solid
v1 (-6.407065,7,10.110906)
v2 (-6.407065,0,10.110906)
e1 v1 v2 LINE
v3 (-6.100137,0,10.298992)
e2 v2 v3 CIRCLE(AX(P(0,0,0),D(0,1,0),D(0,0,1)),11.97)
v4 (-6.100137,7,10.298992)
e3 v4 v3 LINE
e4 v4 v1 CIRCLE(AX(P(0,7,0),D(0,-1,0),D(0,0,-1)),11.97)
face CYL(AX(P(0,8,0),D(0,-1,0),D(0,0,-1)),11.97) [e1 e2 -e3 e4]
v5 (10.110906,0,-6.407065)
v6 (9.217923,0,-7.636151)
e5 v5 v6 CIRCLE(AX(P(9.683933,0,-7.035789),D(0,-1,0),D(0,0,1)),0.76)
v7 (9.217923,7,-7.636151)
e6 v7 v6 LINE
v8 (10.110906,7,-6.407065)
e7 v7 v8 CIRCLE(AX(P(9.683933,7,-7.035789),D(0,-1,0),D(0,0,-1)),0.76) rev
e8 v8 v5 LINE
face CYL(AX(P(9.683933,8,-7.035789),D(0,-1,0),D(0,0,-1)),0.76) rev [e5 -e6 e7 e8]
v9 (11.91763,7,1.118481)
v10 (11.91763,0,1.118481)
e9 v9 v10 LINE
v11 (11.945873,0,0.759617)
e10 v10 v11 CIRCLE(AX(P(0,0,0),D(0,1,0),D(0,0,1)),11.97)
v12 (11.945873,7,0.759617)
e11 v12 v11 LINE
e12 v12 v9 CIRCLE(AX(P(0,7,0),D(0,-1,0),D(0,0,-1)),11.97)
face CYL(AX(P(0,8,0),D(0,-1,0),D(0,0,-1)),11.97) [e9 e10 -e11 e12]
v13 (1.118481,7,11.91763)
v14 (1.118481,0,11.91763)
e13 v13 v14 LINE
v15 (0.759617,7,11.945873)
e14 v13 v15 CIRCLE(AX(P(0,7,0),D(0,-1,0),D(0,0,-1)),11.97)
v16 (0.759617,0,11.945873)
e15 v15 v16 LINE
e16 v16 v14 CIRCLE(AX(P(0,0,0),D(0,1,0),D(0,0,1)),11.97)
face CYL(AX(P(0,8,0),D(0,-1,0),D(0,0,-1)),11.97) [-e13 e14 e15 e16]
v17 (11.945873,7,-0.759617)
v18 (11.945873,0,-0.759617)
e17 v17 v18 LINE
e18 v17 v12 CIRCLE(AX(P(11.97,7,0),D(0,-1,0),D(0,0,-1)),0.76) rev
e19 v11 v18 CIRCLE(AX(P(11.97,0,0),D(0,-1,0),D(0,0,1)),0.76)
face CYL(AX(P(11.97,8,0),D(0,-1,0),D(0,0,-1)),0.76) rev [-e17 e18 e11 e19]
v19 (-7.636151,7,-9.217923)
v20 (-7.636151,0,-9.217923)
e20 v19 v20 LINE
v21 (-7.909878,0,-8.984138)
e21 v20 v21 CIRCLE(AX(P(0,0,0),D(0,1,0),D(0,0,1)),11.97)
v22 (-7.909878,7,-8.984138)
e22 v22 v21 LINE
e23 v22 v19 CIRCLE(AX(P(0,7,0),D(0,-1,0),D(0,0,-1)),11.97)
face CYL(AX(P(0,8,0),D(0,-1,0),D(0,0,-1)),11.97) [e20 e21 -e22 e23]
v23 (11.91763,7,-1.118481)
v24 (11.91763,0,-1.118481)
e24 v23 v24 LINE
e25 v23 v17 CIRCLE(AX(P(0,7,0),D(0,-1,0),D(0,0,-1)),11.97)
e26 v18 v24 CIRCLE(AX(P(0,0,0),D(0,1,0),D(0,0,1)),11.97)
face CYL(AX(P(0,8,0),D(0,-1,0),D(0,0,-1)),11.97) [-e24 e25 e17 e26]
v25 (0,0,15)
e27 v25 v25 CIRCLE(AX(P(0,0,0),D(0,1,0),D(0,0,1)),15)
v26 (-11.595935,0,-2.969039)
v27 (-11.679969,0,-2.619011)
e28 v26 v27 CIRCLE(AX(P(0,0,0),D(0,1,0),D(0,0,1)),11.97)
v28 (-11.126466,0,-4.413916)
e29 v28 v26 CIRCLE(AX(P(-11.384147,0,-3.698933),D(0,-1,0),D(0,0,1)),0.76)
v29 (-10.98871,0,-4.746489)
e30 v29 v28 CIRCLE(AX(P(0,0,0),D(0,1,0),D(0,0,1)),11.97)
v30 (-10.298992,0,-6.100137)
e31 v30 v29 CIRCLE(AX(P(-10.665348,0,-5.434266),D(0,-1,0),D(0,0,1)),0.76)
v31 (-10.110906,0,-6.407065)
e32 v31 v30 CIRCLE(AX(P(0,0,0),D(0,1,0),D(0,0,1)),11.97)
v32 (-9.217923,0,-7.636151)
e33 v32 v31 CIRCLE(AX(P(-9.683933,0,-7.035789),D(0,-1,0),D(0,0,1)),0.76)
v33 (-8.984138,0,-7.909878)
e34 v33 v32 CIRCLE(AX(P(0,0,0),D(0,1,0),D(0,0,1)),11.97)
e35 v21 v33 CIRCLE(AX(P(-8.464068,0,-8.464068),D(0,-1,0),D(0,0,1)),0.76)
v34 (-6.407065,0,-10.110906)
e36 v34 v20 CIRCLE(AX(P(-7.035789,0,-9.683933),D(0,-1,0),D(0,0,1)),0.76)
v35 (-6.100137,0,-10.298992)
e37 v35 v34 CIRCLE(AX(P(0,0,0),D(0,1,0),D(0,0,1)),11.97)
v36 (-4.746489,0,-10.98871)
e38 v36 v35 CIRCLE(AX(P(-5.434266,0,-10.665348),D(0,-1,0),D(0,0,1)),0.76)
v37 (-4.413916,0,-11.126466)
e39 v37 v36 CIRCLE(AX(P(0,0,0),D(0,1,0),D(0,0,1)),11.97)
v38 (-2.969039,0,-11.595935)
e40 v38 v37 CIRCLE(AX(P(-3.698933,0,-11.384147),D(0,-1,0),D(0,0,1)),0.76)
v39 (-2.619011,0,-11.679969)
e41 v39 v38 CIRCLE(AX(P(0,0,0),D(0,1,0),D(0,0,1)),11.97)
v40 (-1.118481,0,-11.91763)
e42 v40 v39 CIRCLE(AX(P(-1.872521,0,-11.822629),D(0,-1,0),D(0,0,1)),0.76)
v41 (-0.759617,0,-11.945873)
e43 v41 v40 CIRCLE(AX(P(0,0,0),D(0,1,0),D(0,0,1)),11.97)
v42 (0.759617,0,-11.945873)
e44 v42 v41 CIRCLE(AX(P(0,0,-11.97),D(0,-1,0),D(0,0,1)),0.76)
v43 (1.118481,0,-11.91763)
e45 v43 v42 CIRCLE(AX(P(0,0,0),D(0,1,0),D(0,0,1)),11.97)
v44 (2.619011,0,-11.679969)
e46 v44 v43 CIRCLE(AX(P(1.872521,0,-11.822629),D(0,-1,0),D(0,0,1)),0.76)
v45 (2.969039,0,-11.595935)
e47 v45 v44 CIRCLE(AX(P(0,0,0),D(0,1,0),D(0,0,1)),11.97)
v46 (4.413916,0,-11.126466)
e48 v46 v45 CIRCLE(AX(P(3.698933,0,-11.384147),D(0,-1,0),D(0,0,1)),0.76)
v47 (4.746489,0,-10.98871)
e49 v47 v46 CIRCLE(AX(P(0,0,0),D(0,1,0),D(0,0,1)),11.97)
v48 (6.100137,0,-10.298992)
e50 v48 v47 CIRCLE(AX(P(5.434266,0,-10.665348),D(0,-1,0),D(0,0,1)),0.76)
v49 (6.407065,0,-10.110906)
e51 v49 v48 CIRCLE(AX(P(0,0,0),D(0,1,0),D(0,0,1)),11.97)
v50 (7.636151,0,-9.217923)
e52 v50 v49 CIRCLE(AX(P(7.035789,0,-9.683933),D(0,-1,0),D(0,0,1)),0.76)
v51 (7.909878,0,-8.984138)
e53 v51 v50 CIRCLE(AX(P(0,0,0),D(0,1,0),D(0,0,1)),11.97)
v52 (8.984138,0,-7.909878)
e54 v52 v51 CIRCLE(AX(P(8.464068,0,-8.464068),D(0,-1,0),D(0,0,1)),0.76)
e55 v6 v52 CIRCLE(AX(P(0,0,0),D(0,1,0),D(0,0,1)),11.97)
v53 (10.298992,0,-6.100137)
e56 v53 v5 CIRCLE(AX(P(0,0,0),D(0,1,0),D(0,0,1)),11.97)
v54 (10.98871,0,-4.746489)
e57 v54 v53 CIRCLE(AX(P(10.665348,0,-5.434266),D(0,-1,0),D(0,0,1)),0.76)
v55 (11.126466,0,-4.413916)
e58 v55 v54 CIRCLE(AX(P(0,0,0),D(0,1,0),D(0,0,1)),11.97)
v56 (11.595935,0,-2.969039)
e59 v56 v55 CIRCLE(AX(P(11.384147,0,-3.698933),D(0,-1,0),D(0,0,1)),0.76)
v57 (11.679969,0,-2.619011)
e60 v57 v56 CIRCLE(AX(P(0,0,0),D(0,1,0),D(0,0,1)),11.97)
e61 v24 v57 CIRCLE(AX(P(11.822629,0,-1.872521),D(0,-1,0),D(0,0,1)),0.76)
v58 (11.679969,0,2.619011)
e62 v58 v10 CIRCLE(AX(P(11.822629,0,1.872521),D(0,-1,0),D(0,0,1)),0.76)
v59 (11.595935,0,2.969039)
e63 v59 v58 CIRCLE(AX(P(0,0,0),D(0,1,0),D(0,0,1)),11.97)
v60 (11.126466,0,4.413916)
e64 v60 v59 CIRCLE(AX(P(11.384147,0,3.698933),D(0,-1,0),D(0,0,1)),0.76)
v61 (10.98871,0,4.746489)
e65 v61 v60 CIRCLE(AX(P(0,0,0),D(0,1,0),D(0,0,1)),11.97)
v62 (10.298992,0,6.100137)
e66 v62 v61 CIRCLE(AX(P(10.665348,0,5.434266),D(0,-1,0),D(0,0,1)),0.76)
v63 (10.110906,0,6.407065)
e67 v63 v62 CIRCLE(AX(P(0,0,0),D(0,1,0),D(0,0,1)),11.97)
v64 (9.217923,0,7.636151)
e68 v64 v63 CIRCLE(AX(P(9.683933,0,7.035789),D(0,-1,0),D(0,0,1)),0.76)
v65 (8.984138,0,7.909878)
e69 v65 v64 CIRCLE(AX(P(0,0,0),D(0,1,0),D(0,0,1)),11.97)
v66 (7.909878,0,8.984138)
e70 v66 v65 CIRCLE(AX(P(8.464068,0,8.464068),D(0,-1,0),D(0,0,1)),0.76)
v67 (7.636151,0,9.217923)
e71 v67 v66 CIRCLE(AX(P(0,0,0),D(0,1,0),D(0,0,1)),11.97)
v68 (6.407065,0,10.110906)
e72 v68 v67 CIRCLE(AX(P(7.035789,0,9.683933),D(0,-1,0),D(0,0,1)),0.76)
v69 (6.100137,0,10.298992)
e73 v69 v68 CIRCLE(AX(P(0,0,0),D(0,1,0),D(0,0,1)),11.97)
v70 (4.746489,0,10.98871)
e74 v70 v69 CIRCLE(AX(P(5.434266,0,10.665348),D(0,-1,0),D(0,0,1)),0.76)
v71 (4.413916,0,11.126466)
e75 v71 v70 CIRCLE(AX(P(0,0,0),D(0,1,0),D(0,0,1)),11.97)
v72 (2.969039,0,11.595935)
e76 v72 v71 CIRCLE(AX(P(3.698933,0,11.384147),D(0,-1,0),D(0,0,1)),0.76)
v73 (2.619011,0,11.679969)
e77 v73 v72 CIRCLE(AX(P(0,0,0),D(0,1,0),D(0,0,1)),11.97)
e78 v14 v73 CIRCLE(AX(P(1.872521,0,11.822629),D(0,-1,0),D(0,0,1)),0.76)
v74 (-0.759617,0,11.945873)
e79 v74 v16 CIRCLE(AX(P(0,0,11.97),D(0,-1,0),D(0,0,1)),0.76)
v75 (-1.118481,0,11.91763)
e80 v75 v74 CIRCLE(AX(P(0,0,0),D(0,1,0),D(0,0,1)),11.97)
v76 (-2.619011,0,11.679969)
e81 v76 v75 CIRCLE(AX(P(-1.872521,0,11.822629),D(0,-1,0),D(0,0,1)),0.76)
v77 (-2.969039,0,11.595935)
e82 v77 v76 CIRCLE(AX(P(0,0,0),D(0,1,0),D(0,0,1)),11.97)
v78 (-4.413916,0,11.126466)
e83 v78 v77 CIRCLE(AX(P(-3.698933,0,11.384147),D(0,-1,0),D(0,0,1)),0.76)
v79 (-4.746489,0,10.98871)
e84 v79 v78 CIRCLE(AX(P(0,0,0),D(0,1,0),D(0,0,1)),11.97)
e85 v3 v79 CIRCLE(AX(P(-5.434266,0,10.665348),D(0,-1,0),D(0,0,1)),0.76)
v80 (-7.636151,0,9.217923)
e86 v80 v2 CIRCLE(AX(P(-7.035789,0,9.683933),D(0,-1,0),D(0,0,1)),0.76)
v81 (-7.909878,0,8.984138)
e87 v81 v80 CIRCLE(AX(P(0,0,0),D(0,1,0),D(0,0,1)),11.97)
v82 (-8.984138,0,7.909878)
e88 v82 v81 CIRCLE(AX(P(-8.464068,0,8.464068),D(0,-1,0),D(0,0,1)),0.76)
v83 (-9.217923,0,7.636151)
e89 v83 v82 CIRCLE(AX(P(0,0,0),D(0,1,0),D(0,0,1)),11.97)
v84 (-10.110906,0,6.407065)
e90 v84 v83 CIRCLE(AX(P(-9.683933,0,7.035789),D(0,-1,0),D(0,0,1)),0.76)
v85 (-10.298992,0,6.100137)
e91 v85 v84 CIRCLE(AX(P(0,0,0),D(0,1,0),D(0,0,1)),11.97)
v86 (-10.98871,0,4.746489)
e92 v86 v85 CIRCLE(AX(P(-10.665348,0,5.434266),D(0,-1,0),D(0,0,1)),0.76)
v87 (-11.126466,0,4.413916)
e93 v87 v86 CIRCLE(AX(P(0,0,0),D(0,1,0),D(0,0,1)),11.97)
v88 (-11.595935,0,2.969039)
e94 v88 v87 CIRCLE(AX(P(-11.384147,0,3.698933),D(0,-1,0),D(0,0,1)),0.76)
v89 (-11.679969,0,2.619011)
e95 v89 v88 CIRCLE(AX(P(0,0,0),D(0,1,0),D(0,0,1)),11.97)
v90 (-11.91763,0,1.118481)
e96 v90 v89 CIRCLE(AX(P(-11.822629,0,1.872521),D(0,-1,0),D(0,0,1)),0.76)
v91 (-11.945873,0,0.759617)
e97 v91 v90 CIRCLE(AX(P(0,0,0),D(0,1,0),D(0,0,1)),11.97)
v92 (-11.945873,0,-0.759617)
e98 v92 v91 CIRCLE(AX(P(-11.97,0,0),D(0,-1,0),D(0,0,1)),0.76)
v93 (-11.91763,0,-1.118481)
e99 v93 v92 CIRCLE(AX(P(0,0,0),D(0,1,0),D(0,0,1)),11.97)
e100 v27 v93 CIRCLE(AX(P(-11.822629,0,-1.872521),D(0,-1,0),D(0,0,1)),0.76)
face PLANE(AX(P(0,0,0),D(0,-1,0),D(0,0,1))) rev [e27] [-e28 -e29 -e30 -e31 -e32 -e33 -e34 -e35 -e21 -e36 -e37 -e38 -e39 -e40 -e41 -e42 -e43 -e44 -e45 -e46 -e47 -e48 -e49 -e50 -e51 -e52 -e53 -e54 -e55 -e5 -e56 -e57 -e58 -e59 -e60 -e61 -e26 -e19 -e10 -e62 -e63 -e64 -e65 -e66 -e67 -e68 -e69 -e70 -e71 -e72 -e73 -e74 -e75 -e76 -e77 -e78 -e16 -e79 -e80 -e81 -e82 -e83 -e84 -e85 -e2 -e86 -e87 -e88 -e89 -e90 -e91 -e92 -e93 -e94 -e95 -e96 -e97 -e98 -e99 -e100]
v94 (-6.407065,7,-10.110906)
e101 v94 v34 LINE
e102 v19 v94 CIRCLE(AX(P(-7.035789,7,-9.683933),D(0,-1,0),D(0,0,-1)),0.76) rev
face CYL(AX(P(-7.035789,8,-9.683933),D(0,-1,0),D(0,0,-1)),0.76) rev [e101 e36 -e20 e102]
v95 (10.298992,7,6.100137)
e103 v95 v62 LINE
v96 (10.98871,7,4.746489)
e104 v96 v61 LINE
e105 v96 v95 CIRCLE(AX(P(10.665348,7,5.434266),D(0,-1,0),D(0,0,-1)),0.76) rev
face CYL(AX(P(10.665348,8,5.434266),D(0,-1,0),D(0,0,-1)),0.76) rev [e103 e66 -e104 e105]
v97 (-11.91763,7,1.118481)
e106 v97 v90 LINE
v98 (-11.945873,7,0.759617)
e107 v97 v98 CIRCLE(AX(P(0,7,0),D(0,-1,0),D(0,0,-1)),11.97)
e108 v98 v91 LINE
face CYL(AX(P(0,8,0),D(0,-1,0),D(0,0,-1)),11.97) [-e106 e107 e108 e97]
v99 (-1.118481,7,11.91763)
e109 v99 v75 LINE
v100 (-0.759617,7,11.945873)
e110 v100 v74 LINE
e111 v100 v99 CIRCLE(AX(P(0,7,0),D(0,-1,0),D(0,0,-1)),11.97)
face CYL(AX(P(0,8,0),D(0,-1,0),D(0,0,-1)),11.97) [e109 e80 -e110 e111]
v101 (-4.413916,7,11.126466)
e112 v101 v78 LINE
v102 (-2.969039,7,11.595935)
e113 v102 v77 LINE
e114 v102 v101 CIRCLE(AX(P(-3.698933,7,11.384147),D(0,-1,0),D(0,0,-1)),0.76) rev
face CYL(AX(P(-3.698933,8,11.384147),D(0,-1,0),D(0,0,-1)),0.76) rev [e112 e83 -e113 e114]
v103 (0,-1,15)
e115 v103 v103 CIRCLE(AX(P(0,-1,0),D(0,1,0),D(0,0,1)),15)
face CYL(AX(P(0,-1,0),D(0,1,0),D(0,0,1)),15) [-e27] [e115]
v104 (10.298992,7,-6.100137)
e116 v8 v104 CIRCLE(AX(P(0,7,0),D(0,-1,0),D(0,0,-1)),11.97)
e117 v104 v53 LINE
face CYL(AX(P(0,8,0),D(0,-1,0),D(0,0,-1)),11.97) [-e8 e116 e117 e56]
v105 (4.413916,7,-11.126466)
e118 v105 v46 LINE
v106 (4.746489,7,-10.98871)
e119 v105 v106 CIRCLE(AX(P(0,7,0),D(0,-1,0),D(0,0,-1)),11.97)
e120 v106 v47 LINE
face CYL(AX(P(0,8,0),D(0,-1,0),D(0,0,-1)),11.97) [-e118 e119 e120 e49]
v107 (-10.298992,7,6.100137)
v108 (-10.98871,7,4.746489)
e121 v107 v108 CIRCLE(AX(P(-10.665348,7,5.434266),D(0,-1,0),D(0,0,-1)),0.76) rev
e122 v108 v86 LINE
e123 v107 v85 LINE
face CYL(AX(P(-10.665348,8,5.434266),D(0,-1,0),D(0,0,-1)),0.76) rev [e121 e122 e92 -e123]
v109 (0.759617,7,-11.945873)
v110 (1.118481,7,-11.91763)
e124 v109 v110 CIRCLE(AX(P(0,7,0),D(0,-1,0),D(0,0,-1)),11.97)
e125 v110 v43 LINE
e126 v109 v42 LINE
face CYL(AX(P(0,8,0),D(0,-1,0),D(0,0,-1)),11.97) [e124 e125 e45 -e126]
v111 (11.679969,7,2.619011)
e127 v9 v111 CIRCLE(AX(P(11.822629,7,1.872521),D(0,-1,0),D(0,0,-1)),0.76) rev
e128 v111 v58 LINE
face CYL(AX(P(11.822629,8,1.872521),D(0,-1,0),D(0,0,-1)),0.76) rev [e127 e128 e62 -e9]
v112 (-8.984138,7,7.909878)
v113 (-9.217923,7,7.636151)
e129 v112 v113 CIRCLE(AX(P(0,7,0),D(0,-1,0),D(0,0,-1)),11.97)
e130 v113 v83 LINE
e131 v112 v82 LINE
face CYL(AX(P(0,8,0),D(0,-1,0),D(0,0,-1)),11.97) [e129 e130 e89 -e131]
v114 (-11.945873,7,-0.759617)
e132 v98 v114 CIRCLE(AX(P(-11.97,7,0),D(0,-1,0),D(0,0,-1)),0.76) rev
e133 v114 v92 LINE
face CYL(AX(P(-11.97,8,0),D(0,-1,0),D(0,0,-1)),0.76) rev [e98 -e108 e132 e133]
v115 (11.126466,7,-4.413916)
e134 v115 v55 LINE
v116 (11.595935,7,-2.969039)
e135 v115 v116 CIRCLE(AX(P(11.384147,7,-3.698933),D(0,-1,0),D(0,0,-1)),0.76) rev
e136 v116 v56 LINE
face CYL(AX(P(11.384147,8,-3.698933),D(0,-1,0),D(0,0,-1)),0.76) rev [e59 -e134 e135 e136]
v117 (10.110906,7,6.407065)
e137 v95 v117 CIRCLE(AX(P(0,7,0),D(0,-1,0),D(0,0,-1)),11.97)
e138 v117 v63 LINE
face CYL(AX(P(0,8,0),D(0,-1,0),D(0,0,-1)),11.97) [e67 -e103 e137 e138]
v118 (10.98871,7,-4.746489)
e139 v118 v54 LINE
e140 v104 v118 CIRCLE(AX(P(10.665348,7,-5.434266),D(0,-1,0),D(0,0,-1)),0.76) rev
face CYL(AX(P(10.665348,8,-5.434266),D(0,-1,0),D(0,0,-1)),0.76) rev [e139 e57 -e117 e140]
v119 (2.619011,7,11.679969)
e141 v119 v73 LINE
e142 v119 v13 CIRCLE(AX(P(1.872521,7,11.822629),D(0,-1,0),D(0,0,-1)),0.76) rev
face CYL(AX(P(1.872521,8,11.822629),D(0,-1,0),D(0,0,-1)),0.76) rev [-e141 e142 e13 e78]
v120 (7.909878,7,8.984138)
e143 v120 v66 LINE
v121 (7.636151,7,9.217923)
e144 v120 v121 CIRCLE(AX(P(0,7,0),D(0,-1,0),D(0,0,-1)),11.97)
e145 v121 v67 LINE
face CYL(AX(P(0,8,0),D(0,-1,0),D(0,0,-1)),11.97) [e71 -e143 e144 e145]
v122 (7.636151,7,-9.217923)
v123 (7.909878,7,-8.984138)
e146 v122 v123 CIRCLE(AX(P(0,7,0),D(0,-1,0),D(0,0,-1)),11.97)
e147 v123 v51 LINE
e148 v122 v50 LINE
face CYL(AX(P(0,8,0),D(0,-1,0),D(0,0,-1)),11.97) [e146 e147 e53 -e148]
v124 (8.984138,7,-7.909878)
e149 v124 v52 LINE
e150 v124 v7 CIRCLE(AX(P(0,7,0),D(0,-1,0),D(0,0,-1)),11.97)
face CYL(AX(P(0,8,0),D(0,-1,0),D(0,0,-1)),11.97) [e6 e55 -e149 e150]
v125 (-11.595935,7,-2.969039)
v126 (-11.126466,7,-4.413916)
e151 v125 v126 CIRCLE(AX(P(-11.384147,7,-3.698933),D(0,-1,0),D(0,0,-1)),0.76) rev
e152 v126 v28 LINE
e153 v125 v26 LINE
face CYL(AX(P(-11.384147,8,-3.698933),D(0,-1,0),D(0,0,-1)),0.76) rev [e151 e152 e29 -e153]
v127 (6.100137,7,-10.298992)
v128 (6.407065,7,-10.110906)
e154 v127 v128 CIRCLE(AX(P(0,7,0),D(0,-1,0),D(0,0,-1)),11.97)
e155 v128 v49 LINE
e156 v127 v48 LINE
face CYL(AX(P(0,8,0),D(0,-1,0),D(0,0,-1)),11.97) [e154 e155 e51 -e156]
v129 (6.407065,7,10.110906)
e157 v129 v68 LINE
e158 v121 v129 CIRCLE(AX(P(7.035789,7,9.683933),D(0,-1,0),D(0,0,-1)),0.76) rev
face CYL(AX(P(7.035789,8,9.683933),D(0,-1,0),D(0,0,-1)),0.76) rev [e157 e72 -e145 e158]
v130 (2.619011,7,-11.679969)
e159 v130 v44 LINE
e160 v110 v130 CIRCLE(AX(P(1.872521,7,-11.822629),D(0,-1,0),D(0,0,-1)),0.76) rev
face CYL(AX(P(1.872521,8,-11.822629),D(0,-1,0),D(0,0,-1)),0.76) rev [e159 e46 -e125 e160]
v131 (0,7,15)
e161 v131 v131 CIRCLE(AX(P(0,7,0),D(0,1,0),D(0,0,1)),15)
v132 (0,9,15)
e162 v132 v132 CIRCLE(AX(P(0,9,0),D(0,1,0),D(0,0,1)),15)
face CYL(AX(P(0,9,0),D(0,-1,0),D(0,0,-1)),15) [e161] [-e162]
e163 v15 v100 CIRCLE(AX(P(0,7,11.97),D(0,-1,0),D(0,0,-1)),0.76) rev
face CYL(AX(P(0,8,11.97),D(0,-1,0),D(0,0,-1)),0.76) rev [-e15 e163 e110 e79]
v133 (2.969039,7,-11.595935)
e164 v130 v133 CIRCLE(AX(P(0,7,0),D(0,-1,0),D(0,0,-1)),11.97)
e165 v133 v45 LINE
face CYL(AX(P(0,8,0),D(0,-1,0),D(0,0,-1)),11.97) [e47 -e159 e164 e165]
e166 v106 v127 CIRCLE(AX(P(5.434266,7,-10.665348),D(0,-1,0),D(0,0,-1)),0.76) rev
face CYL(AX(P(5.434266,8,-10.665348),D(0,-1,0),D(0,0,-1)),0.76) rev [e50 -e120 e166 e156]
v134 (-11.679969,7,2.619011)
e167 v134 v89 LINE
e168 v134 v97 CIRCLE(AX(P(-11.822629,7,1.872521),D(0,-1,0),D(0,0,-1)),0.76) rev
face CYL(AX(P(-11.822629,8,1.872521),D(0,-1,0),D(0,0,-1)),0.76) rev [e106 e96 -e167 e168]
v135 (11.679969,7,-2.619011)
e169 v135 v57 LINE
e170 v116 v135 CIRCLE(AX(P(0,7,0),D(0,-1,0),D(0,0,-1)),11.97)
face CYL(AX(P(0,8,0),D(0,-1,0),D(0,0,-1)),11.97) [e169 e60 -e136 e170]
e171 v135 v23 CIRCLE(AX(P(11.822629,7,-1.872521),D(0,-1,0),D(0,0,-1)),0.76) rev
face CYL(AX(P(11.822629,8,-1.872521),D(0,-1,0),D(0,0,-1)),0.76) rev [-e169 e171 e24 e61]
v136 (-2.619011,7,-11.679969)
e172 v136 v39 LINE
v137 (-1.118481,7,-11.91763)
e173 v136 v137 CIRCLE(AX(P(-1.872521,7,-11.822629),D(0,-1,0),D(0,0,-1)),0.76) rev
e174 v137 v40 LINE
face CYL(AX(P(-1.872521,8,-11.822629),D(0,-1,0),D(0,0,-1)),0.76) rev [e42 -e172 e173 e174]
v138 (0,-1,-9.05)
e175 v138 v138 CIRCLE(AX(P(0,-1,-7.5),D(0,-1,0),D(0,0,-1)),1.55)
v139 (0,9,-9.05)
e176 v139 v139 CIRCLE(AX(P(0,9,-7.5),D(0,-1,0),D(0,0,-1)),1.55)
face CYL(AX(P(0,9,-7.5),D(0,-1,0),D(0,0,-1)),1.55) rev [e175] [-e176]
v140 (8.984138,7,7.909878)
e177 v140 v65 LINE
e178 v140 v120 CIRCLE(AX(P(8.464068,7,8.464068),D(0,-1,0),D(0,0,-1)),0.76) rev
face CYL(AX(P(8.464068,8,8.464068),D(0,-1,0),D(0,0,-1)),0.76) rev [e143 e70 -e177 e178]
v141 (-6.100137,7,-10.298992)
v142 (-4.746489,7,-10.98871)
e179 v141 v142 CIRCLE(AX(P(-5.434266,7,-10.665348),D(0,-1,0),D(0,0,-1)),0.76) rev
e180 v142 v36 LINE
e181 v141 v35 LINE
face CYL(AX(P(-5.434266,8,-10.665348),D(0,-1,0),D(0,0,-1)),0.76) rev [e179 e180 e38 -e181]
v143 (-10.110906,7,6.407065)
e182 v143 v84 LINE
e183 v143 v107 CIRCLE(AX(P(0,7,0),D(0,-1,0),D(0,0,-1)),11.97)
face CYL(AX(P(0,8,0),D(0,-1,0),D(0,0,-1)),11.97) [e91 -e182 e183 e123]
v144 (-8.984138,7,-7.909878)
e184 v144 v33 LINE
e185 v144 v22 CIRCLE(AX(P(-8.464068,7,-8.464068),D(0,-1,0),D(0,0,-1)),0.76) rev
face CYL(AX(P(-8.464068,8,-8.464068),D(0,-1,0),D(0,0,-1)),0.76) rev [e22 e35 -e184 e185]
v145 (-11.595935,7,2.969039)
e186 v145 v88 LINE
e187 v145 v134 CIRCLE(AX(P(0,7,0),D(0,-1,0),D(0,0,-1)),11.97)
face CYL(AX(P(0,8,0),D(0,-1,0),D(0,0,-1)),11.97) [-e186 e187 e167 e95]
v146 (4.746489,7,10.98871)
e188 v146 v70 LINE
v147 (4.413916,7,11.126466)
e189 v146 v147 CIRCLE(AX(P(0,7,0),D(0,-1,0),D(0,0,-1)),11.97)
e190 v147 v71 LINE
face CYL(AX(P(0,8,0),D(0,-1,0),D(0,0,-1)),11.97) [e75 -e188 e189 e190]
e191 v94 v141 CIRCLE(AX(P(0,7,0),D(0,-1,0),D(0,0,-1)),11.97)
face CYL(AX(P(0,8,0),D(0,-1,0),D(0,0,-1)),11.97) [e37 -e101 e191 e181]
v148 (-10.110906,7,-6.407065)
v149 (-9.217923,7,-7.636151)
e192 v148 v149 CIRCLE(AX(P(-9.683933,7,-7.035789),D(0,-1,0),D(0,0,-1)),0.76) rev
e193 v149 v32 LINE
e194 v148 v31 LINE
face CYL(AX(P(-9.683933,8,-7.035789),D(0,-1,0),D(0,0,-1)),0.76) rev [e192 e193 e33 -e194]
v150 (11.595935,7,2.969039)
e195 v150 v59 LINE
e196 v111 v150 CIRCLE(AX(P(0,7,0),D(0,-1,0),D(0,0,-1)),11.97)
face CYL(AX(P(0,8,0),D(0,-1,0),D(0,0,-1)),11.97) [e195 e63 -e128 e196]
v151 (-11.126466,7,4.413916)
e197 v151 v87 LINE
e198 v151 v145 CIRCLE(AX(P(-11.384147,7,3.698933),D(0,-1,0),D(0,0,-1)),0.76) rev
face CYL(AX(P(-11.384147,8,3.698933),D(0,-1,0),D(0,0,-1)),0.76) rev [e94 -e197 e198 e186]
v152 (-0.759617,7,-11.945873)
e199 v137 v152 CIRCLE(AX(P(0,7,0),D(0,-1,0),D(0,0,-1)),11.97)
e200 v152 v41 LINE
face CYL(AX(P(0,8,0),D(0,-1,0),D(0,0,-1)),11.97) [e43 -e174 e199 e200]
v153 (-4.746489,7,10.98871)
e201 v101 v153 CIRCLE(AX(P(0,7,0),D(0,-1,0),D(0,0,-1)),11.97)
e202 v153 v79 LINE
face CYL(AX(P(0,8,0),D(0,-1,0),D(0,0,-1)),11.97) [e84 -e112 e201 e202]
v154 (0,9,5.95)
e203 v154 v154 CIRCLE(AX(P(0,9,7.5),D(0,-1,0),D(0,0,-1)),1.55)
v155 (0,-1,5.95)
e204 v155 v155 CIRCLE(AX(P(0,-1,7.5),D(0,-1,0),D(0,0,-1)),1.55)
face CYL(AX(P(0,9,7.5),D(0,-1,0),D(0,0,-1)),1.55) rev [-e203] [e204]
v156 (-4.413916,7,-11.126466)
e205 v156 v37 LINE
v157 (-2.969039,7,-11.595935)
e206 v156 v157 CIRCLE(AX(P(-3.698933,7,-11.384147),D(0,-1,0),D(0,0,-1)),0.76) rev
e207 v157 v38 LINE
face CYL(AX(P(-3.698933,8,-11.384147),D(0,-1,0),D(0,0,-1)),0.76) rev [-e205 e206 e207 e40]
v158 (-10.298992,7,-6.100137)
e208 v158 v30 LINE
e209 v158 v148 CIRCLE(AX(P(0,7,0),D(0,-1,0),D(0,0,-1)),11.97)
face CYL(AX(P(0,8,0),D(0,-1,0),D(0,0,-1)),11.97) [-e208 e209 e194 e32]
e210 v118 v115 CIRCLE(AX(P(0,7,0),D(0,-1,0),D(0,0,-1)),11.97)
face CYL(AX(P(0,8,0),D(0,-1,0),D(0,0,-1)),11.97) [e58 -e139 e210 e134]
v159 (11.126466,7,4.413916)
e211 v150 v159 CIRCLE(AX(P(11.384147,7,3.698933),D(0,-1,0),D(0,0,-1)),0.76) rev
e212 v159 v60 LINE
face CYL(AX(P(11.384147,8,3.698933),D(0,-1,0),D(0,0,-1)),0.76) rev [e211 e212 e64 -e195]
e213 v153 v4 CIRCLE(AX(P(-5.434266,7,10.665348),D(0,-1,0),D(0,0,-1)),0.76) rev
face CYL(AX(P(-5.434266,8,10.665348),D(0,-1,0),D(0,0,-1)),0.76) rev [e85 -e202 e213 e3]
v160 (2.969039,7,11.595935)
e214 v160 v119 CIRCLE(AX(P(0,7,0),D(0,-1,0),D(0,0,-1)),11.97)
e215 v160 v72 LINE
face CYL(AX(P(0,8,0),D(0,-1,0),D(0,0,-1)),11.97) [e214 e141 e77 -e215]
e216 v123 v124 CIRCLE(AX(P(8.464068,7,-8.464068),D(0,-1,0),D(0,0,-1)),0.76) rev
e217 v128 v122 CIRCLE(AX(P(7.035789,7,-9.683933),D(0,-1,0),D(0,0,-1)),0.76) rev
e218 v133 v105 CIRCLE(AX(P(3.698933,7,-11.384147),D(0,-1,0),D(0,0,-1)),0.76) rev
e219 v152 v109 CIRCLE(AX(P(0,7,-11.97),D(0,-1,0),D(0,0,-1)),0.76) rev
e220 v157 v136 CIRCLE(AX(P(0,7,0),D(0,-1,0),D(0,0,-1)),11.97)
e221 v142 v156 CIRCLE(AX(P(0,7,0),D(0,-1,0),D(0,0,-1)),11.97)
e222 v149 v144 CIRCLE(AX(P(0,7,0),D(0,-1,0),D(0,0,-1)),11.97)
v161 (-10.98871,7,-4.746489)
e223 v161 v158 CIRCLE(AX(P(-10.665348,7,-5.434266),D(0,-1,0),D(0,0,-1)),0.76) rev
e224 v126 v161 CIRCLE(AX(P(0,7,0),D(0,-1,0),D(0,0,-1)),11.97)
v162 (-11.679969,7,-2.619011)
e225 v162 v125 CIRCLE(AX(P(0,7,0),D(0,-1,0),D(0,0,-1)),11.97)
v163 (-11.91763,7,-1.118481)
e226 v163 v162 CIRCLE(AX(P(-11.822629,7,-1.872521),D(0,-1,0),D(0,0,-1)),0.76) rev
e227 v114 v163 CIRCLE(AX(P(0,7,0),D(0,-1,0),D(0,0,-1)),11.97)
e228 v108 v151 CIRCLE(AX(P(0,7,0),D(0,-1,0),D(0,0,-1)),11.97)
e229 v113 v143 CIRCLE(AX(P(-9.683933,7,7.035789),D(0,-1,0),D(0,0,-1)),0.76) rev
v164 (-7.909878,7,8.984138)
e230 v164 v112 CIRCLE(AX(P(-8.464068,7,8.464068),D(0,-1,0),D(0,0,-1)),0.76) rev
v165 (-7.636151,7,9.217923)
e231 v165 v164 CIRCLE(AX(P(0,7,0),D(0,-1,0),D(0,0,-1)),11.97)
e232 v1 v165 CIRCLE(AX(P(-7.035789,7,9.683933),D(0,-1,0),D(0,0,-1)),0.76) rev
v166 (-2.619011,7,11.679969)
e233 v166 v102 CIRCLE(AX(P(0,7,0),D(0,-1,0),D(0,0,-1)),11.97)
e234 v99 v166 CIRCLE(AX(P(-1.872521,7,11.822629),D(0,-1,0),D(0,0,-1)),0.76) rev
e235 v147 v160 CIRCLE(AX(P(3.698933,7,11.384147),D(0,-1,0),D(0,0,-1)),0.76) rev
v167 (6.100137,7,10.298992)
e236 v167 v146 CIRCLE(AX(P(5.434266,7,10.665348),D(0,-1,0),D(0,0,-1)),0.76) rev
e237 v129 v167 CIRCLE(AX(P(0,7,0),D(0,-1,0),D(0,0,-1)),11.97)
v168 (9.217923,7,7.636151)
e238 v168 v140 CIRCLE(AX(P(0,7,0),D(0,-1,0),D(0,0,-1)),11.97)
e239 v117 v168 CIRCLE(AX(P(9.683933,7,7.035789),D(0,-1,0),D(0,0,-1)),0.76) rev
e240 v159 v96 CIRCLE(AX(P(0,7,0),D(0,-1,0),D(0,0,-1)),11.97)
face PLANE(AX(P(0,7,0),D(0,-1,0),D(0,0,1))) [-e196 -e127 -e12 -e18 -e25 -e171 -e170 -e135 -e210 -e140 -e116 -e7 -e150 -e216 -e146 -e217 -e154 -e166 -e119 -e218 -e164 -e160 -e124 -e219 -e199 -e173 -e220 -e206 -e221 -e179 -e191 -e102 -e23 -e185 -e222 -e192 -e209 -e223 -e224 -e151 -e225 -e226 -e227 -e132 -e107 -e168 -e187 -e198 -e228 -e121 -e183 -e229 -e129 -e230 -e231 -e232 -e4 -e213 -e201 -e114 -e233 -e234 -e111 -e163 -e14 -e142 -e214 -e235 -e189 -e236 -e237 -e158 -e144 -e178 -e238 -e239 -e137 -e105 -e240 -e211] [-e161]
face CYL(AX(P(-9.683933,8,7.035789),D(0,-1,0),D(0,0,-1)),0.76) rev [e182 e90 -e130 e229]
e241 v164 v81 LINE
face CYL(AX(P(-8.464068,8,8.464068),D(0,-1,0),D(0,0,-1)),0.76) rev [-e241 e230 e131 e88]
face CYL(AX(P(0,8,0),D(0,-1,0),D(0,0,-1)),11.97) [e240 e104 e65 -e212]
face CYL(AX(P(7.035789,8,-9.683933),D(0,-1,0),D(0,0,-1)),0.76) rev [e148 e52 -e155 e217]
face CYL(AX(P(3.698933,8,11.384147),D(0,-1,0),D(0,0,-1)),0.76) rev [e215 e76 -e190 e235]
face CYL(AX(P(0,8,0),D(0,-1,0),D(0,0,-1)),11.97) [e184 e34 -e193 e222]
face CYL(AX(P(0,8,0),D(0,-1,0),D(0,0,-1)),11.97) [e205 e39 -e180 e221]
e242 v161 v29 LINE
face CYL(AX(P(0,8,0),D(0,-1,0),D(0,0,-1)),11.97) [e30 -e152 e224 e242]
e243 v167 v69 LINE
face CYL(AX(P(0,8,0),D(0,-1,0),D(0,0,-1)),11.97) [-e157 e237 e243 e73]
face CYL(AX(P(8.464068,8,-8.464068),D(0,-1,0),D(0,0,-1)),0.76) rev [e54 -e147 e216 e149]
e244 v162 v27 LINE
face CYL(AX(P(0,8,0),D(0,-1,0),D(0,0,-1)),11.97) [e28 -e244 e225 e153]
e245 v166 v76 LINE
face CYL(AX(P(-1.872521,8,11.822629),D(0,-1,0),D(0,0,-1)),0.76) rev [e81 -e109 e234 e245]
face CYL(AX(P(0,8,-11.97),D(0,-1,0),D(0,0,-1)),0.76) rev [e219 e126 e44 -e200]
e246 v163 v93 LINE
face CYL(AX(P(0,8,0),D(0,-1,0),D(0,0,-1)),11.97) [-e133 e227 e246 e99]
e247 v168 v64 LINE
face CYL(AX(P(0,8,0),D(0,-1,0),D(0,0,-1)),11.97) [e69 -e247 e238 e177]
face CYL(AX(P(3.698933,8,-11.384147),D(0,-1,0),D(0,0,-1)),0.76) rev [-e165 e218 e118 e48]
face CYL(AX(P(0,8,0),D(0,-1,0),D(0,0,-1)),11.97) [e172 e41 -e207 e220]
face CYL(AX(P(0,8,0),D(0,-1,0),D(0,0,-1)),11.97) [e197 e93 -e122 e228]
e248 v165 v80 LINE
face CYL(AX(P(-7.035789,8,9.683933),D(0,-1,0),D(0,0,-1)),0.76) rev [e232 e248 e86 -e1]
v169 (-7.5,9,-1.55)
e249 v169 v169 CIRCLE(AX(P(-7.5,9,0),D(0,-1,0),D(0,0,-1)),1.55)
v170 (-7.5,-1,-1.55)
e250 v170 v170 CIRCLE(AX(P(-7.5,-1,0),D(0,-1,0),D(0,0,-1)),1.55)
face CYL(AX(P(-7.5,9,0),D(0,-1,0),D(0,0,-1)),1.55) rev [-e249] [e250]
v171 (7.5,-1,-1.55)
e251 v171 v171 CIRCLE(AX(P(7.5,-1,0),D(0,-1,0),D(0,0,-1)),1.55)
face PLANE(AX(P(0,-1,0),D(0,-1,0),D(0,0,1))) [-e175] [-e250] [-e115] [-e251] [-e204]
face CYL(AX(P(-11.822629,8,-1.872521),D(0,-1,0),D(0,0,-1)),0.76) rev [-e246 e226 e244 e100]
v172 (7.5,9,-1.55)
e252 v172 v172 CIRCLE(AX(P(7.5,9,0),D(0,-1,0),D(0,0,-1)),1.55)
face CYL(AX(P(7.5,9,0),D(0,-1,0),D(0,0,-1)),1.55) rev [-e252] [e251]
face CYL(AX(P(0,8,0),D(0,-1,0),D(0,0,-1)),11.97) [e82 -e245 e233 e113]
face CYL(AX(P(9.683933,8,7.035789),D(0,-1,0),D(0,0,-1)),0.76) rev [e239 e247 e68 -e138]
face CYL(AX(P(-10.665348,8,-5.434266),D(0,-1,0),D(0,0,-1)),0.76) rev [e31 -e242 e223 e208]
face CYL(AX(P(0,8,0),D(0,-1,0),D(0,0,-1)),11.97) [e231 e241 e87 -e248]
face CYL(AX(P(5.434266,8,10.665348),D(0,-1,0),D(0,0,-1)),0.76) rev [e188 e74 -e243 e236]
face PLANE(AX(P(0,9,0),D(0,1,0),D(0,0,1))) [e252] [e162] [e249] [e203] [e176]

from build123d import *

# Parameters (mm, degrees)
BOSS_EXTRUDE1_DEPTH = 8
SKETCH2_R           = 15
BOSS_EXTRUDE2_DEPTH = 1
MIRROR1_START       = -1
MIRROR1_OUTLINE_R   = 15
MIRROR1_DEPTH       = 1
MIRROR1_START_2     = 7
MIRROR1_2_OUTLINE_R = 15
MIRROR1_2_DEPTH     = 1
SKETCH6_R           = 1.55
CUT_EXTRUDE3_DEPTH  = 24.452078799


# Read off the part's stored shape, not the designer's step: Mirror1
with BuildPart() as part:
    # Sketch1 → Boss-Extrude1 (new body)
    with BuildSketch(Plane(origin=(0, 0, 0), x_dir=(1, 0, 0), z_dir=(0, 1, 0))):
        with BuildLine():
            ThreePointArc((-2.619011045, 11.679969227), (-2.794341005, 11.639267947), (-2.969039138, 11.595934917))
            ThreePointArc((-2.969039138, 11.595934917), (-3.464080507, 10.661343548), (-4.413916411, 11.126465832))
            ThreePointArc((-4.413916411, 11.126465832), (-4.580720685, 11.058838004), (-4.746489215, 10.988709666))
            ThreePointArc((-4.746489215, 10.988709666), (-5.089233502, 9.988183136), (-6.100136506, 10.298991922))
            ThreePointArc((-6.100136506, 10.298991922), (-6.25430782, 10.206102767), (-6.407064974, 10.110905915))
            ThreePointArc((-6.407064974, 10.110905915), (-6.589072678, 9.069080507), (-7.636150994, 9.21792265))
            ThreePointArc((-7.636150994, 9.21792265), (-7.773893139, 9.102059408), (-7.909877531, 8.984138103))
            ThreePointArc((-7.909877531, 8.984138103), (-7.926667017, 7.926667017), (-8.984138103, 7.909877531))
            ThreePointArc((-8.984138103, 7.909877531), (-9.102059408, 7.773893139), (-9.21792265, 7.636150994))
            ThreePointArc((-9.21792265, 7.636150994), (-9.069080507, 6.589072678), (-10.110905915, 6.407064974))
            ThreePointArc((-10.110905915, 6.407064974), (-10.206102767, 6.25430782), (-10.298991922, 6.100136506))
            ThreePointArc((-10.298991922, 6.100136506), (-9.988183136, 5.089233502), (-10.988709666, 4.746489215))
            ThreePointArc((-10.988709666, 4.746489215), (-11.058838004, 4.580720685), (-11.126465832, 4.413916411))
            ThreePointArc((-11.126465832, 4.413916411), (-10.661343548, 3.464080507), (-11.595934917, 2.969039138))
            ThreePointArc((-11.595934917, 2.969039138), (-11.639267947, 2.794341005), (-11.679969227, 2.619011045))
            ThreePointArc((-11.679969227, 2.619011045), (-11.071986298, 1.753630353), (-11.917629765, 1.118481464))
            ThreePointArc((-11.917629765, 1.118481464), (-11.933100485, 0.939155376), (-11.945873016, 0.759616935))
            ThreePointArc((-11.945873016, 0.759616935), (-11.21, 0), (-11.945873016, -0.759616935))
            ThreePointArc((-11.945873016, -0.759616935), (-11.933100485, -0.939155376), (-11.917629765, -1.118481464))
            ThreePointArc((-11.917629765, -1.118481464), (-11.071986298, -1.753630353), (-11.679969227, -2.619011045))
            ThreePointArc((-11.679969227, -2.619011045), (-11.639267947, -2.794341005), (-11.595934917, -2.969039138))
            ThreePointArc((-11.595934917, -2.969039138), (-10.661343548, -3.464080507), (-11.126465832, -4.413916411))
            ThreePointArc((-11.126465832, -4.413916411), (-11.058838004, -4.580720685), (-10.988709666, -4.746489215))
            ThreePointArc((-10.988709666, -4.746489215), (-9.988183136, -5.089233502), (-10.298991922, -6.100136506))
            ThreePointArc((-10.298991922, -6.100136506), (-10.206102767, -6.25430782), (-10.110905915, -6.407064974))
            ThreePointArc((-10.110905915, -6.407064974), (-9.069080507, -6.589072678), (-9.21792265, -7.636150994))
            ThreePointArc((-9.21792265, -7.636150994), (-9.102059408, -7.773893139), (-8.984138103, -7.909877531))
            ThreePointArc((-8.984138103, -7.909877531), (-7.926667017, -7.926667017), (-7.909877531, -8.984138103))
            ThreePointArc((-7.909877531, -8.984138103), (-7.773893139, -9.102059408), (-7.636150994, -9.21792265))
            ThreePointArc((-7.636150994, -9.21792265), (-6.589072678, -9.069080507), (-6.407064974, -10.110905915))
            ThreePointArc((-6.407064974, -10.110905915), (-6.25430782, -10.206102767), (-6.100136506, -10.298991922))
            ThreePointArc((-6.100136506, -10.298991922), (-5.089233502, -9.988183136), (-4.746489215, -10.988709666))
            ThreePointArc((-4.746489215, -10.988709666), (-4.580720685, -11.058838004), (-4.413916411, -11.126465832))
            ThreePointArc((-4.413916411, -11.126465832), (-3.464080507, -10.661343548), (-2.969039138, -11.595934917))
            ThreePointArc((-2.969039138, -11.595934917), (-2.794341005, -11.639267947), (-2.619011045, -11.679969227))
            ThreePointArc((-2.619011045, -11.679969227), (-1.753630353, -11.071986298), (-1.118481464, -11.917629765))
            ThreePointArc((-1.118481464, -11.917629765), (-0.939155376, -11.933100485), (-0.759616935, -11.945873016))
            ThreePointArc((-0.759616935, -11.945873016), (0, -11.21), (0.759616935, -11.945873016))
            ThreePointArc((0.759616935, -11.945873016), (0.939155376, -11.933100485), (1.118481464, -11.917629765))
            ThreePointArc((1.118481464, -11.917629765), (1.753630353, -11.071986298), (2.619011045, -11.679969227))
            ThreePointArc((2.619011045, -11.679969227), (2.794341005, -11.639267947), (2.969039138, -11.595934917))
            ThreePointArc((2.969039138, -11.595934917), (3.464080507, -10.661343548), (4.413916411, -11.126465832))
            ThreePointArc((4.413916411, -11.126465832), (4.580720685, -11.058838004), (4.746489215, -10.988709666))
            ThreePointArc((4.746489215, -10.988709666), (5.089233502, -9.988183136), (6.100136506, -10.298991922))
            ThreePointArc((6.100136506, -10.298991922), (6.25430782, -10.206102767), (6.407064974, -10.110905915))
            ThreePointArc((6.407064974, -10.110905915), (6.589072678, -9.069080507), (7.636150994, -9.21792265))
            ThreePointArc((7.636150994, -9.21792265), (7.773893139, -9.102059408), (7.909877531, -8.984138103))
            ThreePointArc((7.909877531, -8.984138103), (7.926667017, -7.926667017), (8.984138103, -7.909877531))
            ThreePointArc((8.984138103, -7.909877531), (9.102059408, -7.773893139), (9.21792265, -7.636150994))
            ThreePointArc((9.21792265, -7.636150994), (9.069080507, -6.589072678), (10.110905915, -6.407064974))
            ThreePointArc((10.110905915, -6.407064974), (10.206102767, -6.25430782), (10.298991922, -6.100136506))
            ThreePointArc((10.298991922, -6.100136506), (9.988183136, -5.089233502), (10.988709666, -4.746489215))
            ThreePointArc((10.988709666, -4.746489215), (11.058838004, -4.580720685), (11.126465832, -4.413916411))
            ThreePointArc((11.126465832, -4.413916411), (10.661343548, -3.464080507), (11.595934917, -2.969039138))
            ThreePointArc((11.595934917, -2.969039138), (11.639267947, -2.794341005), (11.679969227, -2.619011045))
            ThreePointArc((11.679969227, -2.619011045), (11.071986298, -1.753630353), (11.917629765, -1.118481464))
            ThreePointArc((11.917629765, -1.118481464), (11.933100485, -0.939155376), (11.945873016, -0.759616935))
            ThreePointArc((11.945873016, -0.759616935), (11.21, 0), (11.945873016, 0.759616935))
            ThreePointArc((11.945873016, 0.759616935), (11.933100485, 0.939155376), (11.917629765, 1.118481464))
            ThreePointArc((11.917629765, 1.118481464), (11.071986298, 1.753630353), (11.679969227, 2.619011045))
            ThreePointArc((11.679969227, 2.619011045), (11.639267947, 2.794341005), (11.595934917, 2.969039138))
            ThreePointArc((11.595934917, 2.969039138), (10.661343548, 3.464080507), (11.126465832, 4.413916411))
            ThreePointArc((11.126465832, 4.413916411), (11.058838004, 4.580720685), (10.988709666, 4.746489215))
            ThreePointArc((10.988709666, 4.746489215), (9.988183136, 5.089233502), (10.298991922, 6.100136506))
            ThreePointArc((10.298991922, 6.100136506), (10.206102767, 6.25430782), (10.110905915, 6.407064974))
            ThreePointArc((10.110905915, 6.407064974), (9.069080507, 6.589072678), (9.21792265, 7.636150994))
            ThreePointArc((9.21792265, 7.636150994), (9.102059408, 7.773893139), (8.984138103, 7.909877531))
            ThreePointArc((8.984138103, 7.909877531), (7.926667017, 7.926667017), (7.909877531, 8.984138103))
            ThreePointArc((7.909877531, 8.984138103), (7.773893139, 9.102059408), (7.636150994, 9.21792265))
            ThreePointArc((7.636150994, 9.21792265), (6.589072678, 9.069080507), (6.407064974, 10.110905915))
            ThreePointArc((6.407064974, 10.110905915), (6.25430782, 10.206102767), (6.100136506, 10.298991922))
            ThreePointArc((6.100136506, 10.298991922), (5.089233502, 9.988183136), (4.746489215, 10.988709666))
            ThreePointArc((4.746489215, 10.988709666), (4.580720685, 11.058838004), (4.413916411, 11.126465832))
            ThreePointArc((4.413916411, 11.126465832), (3.464080507, 10.661343548), (2.969039138, 11.595934917))
            ThreePointArc((2.969039138, 11.595934917), (2.794341005, 11.639267947), (2.619011045, 11.679969227))
            ThreePointArc((2.619011045, 11.679969227), (1.753630353, 11.071986298), (1.118481464, 11.917629765))
            ThreePointArc((1.118481464, 11.917629765), (0.939155376, 11.933100485), (0.759616935, 11.945873016))
            ThreePointArc((0.759616935, 11.945873016), (0, 11.21), (-0.759616935, 11.945873016))
            ThreePointArc((-0.759616935, 11.945873016), (-0.939155376, 11.933100485), (-1.118481464, 11.917629765))
            ThreePointArc((-1.118481464, 11.917629765), (-1.753630353, 11.071986298), (-2.619011045, 11.679969227))
        make_face()
    extrude(amount=BOSS_EXTRUDE1_DEPTH)

    # Sketch2 → Boss-Extrude2 (add)
    with BuildSketch(Plane(origin=(0, 8, 0), x_dir=(1, 0, 0), z_dir=(0, 1, 0))):
        with Locations(Location((0, 0, 0), (0, 0, 270))):
            Circle(SKETCH2_R)
    extrude(amount=BOSS_EXTRUDE2_DEPTH)

    # Mirror1 outline → Mirror1 (add)
    with BuildSketch(Plane(origin=(0, 0, 0), x_dir=(1, 0, 0), z_dir=(0, 1, 0)).offset(MIRROR1_START)):
        Circle(MIRROR1_OUTLINE_R)
    extrude(amount=MIRROR1_DEPTH)

    # Mirror1 2 outline → Mirror1 2 (add)
    with BuildSketch(Plane(origin=(0, 0, 0), x_dir=(1, 0, 0), z_dir=(0, 1, 0)).offset(MIRROR1_START_2)):
        Circle(MIRROR1_2_OUTLINE_R)
        with BuildLine():
            ThreePointArc((-10.988709666, 4.746489215), (-9.988183136, 5.089233502), (-10.298991922, 6.100136506))
            ThreePointArc((-10.298991922, 6.100136506), (-10.206102767, 6.254307819), (-10.110905915, 6.407064974))
            ThreePointArc((-10.110905915, 6.407064974), (-9.069080507, 6.589072678), (-9.21792265, 7.636150994))
            ThreePointArc((-9.21792265, 7.636150994), (-9.102059408, 7.773893139), (-8.984138103, 7.909877531))
            ThreePointArc((-8.984138103, 7.909877531), (-7.926667017, 7.926667017), (-7.909877531, 8.984138103))
            ThreePointArc((-7.909877531, 8.984138103), (-7.773893139, 9.102059408), (-7.636150994, 9.21792265))
            ThreePointArc((-7.636150994, 9.21792265), (-6.589072678, 9.069080507), (-6.407064974, 10.110905915))
            ThreePointArc((-6.407064974, 10.110905915), (-6.254307819, 10.206102767), (-6.100136506, 10.298991922))
            ThreePointArc((-6.100136506, 10.298991922), (-5.089233502, 9.988183136), (-4.746489215, 10.988709666))
            ThreePointArc((-4.746489215, 10.988709666), (-4.580720685, 11.058838004), (-4.413916411, 11.126465832))
            ThreePointArc((-4.413916411, 11.126465832), (-3.464080507, 10.661343548), (-2.969039138, 11.595934917))
            ThreePointArc((-2.969039138, 11.595934917), (-2.794341005, 11.639267947), (-2.619011045, 11.679969227))
            ThreePointArc((-2.619011045, 11.679969227), (-1.753630353, 11.071986298), (-1.118481464, 11.917629765))
            ThreePointArc((-1.118481464, 11.917629765), (-0.939155376, 11.933100485), (-0.759616935, 11.945873016))
            ThreePointArc((-0.759616935, 11.945873016), (0, 11.21), (0.759616935, 11.945873016))
            ThreePointArc((0.759616935, 11.945873016), (0.939155376, 11.933100485), (1.118481464, 11.917629765))
            ThreePointArc((1.118481464, 11.917629765), (1.753630353, 11.071986298), (2.619011045, 11.679969227))
            ThreePointArc((2.619011045, 11.679969227), (2.794341005, 11.639267947), (2.969039138, 11.595934917))
            ThreePointArc((2.969039138, 11.595934917), (3.464080507, 10.661343548), (4.413916411, 11.126465832))
            ThreePointArc((4.413916411, 11.126465832), (4.580720685, 11.058838004), (4.746489215, 10.988709666))
            ThreePointArc((4.746489215, 10.988709666), (5.089233502, 9.988183136), (6.100136506, 10.298991922))
            ThreePointArc((6.100136506, 10.298991922), (6.254307819, 10.206102767), (6.407064974, 10.110905915))
            ThreePointArc((6.407064974, 10.110905915), (6.589072678, 9.069080507), (7.636150994, 9.21792265))
            ThreePointArc((7.636150994, 9.21792265), (7.773893139, 9.102059408), (7.909877531, 8.984138103))
            ThreePointArc((7.909877531, 8.984138103), (7.926667017, 7.926667017), (8.984138103, 7.909877531))
            ThreePointArc((8.984138103, 7.909877531), (9.102059408, 7.773893139), (9.21792265, 7.636150994))
            ThreePointArc((9.21792265, 7.636150994), (9.069080507, 6.589072678), (10.110905915, 6.407064974))
            ThreePointArc((10.110905915, 6.407064974), (10.206102767, 6.254307819), (10.298991922, 6.100136506))
            ThreePointArc((10.298991922, 6.100136506), (9.988183136, 5.089233502), (10.988709666, 4.746489215))
            ThreePointArc((10.988709666, 4.746489215), (11.058838004, 4.580720685), (11.126465832, 4.413916411))
            ThreePointArc((11.126465832, 4.413916411), (10.661343548, 3.464080507), (11.595934917, 2.969039138))
            ThreePointArc((11.595934917, 2.969039138), (11.639267947, 2.794341005), (11.679969227, 2.619011045))
            ThreePointArc((11.679969227, 2.619011045), (11.071986298, 1.753630353), (11.917629765, 1.118481464))
            ThreePointArc((11.917629765, 1.118481464), (11.933100485, 0.939155376), (11.945873016, 0.759616935))
            ThreePointArc((11.945873016, 0.759616935), (11.21, 0), (11.945873016, -0.759616935))
            ThreePointArc((11.945873016, -0.759616935), (11.933100485, -0.939155376), (11.917629765, -1.118481464))
            ThreePointArc((11.917629765, -1.118481464), (11.071986298, -1.753630353), (11.679969227, -2.619011045))
            ThreePointArc((11.679969227, -2.619011045), (11.639267947, -2.794341005), (11.595934917, -2.969039138))
            ThreePointArc((11.595934917, -2.969039138), (10.661343548, -3.464080507), (11.126465832, -4.413916411))
            ThreePointArc((11.126465832, -4.413916411), (11.058838004, -4.580720685), (10.988709666, -4.746489215))
            ThreePointArc((10.988709666, -4.746489215), (9.988183136, -5.089233502), (10.298991922, -6.100136506))
            ThreePointArc((10.298991922, -6.100136506), (10.206102767, -6.254307819), (10.110905915, -6.407064974))
            ThreePointArc((10.110905915, -6.407064974), (9.069080507, -6.589072678), (9.21792265, -7.636150994))
            ThreePointArc((9.21792265, -7.636150994), (9.102059408, -7.773893139), (8.984138103, -7.909877531))
            ThreePointArc((8.984138103, -7.909877531), (7.926667017, -7.926667017), (7.909877531, -8.984138103))
            ThreePointArc((7.909877531, -8.984138103), (7.773893139, -9.102059408), (7.636150994, -9.21792265))
            ThreePointArc((7.636150994, -9.21792265), (6.589072678, -9.069080507), (6.407064974, -10.110905915))
            ThreePointArc((6.407064974, -10.110905915), (6.254307819, -10.206102767), (6.100136506, -10.298991922))
            ThreePointArc((6.100136506, -10.298991922), (5.089233502, -9.988183136), (4.746489215, -10.988709666))
            ThreePointArc((4.746489215, -10.988709666), (4.580720685, -11.058838004), (4.413916411, -11.126465832))
            ThreePointArc((4.413916411, -11.126465832), (3.464080507, -10.661343548), (2.969039138, -11.595934917))
            ThreePointArc((2.969039138, -11.595934917), (2.794341005, -11.639267947), (2.619011045, -11.679969227))
            ThreePointArc((2.619011045, -11.679969227), (1.753630353, -11.071986298), (1.118481464, -11.917629765))
            ThreePointArc((1.118481464, -11.917629765), (0.939155376, -11.933100485), (0.759616935, -11.945873016))
            ThreePointArc((0.759616935, -11.945873016), (0, -11.21), (-0.759616935, -11.945873016))
            ThreePointArc((-0.759616935, -11.945873016), (-0.939155376, -11.933100485), (-1.118481464, -11.917629765))
            ThreePointArc((-1.118481464, -11.917629765), (-1.753630353, -11.071986298), (-2.619011045, -11.679969227))
            ThreePointArc((-2.619011045, -11.679969227), (-2.794341005, -11.639267947), (-2.969039138, -11.595934917))
            ThreePointArc((-2.969039138, -11.595934917), (-3.464080507, -10.661343548), (-4.413916411, -11.126465832))
            ThreePointArc((-4.413916411, -11.126465832), (-4.580720685, -11.058838004), (-4.746489215, -10.988709666))
            ThreePointArc((-4.746489215, -10.988709666), (-5.089233502, -9.988183136), (-6.100136506, -10.298991922))
            ThreePointArc((-6.100136506, -10.298991922), (-6.254307819, -10.206102767), (-6.407064974, -10.110905915))
            ThreePointArc((-6.407064974, -10.110905915), (-6.589072678, -9.069080507), (-7.636150994, -9.21792265))
            ThreePointArc((-7.636150994, -9.21792265), (-7.773893139, -9.102059408), (-7.909877531, -8.984138103))
            ThreePointArc((-7.909877531, -8.984138103), (-7.926667017, -7.926667017), (-8.984138103, -7.909877531))
            ThreePointArc((-8.984138103, -7.909877531), (-9.102059408, -7.773893139), (-9.21792265, -7.636150994))
            ThreePointArc((-9.21792265, -7.636150994), (-9.069080507, -6.589072678), (-10.110905915, -6.407064974))
            ThreePointArc((-10.110905915, -6.407064974), (-10.206102767, -6.254307819), (-10.298991922, -6.100136506))
            ThreePointArc((-10.298991922, -6.100136506), (-9.988183136, -5.089233502), (-10.988709666, -4.746489215))
            ThreePointArc((-10.988709666, -4.746489215), (-11.058838004, -4.580720685), (-11.126465832, -4.413916411))
            ThreePointArc((-11.126465832, -4.413916411), (-10.661343548, -3.464080507), (-11.595934917, -2.969039138))
            ThreePointArc((-11.595934917, -2.969039138), (-11.639267947, -2.794341005), (-11.679969227, -2.619011045))
            ThreePointArc((-11.679969227, -2.619011045), (-11.071986298, -1.753630353), (-11.917629765, -1.118481464))
            ThreePointArc((-11.917629765, -1.118481464), (-11.933100485, -0.939155376), (-11.945873016, -0.759616935))
            ThreePointArc((-11.945873016, -0.759616935), (-11.21, 0), (-11.945873016, 0.759616935))
            ThreePointArc((-11.945873016, 0.759616935), (-11.933100485, 0.939155376), (-11.917629765, 1.118481464))
            ThreePointArc((-11.917629765, 1.118481464), (-11.071986298, 1.753630353), (-11.679969227, 2.619011045))
            ThreePointArc((-11.679969227, 2.619011045), (-11.639267947, 2.794341005), (-11.595934917, 2.969039138))
            ThreePointArc((-11.595934917, 2.969039138), (-10.661343548, 3.464080507), (-11.126465832, 4.413916411))
            ThreePointArc((-11.126465832, 4.413916411), (-11.058838004, 4.580720685), (-10.988709666, 4.746489215))
        make_face(mode=Mode.SUBTRACT)
    extrude(amount=MIRROR1_2_DEPTH)

    # Sketch6 → Cut-Extrude3 (cut, through all)
    with BuildSketch(Plane.XZ.offset(1)):
        with Locations(Location((7.5, 0, 0), (0, 0, 270))):
            Circle(SKETCH6_R)
        with Locations(Location((0, -7.5, 0), (0, 0, 270))):
            Circle(SKETCH6_R)
        with Locations(Location((-7.5, 0, 0), (0, 0, 270))):
            Circle(SKETCH6_R)
        with Locations(Location((0, 7.5, 0), (0, 0, 270))):
            Circle(SKETCH6_R)
    extrude(amount=-CUT_EXTRUDE3_DEPTH, mode=Mode.SUBTRACT)


solid = part.part
